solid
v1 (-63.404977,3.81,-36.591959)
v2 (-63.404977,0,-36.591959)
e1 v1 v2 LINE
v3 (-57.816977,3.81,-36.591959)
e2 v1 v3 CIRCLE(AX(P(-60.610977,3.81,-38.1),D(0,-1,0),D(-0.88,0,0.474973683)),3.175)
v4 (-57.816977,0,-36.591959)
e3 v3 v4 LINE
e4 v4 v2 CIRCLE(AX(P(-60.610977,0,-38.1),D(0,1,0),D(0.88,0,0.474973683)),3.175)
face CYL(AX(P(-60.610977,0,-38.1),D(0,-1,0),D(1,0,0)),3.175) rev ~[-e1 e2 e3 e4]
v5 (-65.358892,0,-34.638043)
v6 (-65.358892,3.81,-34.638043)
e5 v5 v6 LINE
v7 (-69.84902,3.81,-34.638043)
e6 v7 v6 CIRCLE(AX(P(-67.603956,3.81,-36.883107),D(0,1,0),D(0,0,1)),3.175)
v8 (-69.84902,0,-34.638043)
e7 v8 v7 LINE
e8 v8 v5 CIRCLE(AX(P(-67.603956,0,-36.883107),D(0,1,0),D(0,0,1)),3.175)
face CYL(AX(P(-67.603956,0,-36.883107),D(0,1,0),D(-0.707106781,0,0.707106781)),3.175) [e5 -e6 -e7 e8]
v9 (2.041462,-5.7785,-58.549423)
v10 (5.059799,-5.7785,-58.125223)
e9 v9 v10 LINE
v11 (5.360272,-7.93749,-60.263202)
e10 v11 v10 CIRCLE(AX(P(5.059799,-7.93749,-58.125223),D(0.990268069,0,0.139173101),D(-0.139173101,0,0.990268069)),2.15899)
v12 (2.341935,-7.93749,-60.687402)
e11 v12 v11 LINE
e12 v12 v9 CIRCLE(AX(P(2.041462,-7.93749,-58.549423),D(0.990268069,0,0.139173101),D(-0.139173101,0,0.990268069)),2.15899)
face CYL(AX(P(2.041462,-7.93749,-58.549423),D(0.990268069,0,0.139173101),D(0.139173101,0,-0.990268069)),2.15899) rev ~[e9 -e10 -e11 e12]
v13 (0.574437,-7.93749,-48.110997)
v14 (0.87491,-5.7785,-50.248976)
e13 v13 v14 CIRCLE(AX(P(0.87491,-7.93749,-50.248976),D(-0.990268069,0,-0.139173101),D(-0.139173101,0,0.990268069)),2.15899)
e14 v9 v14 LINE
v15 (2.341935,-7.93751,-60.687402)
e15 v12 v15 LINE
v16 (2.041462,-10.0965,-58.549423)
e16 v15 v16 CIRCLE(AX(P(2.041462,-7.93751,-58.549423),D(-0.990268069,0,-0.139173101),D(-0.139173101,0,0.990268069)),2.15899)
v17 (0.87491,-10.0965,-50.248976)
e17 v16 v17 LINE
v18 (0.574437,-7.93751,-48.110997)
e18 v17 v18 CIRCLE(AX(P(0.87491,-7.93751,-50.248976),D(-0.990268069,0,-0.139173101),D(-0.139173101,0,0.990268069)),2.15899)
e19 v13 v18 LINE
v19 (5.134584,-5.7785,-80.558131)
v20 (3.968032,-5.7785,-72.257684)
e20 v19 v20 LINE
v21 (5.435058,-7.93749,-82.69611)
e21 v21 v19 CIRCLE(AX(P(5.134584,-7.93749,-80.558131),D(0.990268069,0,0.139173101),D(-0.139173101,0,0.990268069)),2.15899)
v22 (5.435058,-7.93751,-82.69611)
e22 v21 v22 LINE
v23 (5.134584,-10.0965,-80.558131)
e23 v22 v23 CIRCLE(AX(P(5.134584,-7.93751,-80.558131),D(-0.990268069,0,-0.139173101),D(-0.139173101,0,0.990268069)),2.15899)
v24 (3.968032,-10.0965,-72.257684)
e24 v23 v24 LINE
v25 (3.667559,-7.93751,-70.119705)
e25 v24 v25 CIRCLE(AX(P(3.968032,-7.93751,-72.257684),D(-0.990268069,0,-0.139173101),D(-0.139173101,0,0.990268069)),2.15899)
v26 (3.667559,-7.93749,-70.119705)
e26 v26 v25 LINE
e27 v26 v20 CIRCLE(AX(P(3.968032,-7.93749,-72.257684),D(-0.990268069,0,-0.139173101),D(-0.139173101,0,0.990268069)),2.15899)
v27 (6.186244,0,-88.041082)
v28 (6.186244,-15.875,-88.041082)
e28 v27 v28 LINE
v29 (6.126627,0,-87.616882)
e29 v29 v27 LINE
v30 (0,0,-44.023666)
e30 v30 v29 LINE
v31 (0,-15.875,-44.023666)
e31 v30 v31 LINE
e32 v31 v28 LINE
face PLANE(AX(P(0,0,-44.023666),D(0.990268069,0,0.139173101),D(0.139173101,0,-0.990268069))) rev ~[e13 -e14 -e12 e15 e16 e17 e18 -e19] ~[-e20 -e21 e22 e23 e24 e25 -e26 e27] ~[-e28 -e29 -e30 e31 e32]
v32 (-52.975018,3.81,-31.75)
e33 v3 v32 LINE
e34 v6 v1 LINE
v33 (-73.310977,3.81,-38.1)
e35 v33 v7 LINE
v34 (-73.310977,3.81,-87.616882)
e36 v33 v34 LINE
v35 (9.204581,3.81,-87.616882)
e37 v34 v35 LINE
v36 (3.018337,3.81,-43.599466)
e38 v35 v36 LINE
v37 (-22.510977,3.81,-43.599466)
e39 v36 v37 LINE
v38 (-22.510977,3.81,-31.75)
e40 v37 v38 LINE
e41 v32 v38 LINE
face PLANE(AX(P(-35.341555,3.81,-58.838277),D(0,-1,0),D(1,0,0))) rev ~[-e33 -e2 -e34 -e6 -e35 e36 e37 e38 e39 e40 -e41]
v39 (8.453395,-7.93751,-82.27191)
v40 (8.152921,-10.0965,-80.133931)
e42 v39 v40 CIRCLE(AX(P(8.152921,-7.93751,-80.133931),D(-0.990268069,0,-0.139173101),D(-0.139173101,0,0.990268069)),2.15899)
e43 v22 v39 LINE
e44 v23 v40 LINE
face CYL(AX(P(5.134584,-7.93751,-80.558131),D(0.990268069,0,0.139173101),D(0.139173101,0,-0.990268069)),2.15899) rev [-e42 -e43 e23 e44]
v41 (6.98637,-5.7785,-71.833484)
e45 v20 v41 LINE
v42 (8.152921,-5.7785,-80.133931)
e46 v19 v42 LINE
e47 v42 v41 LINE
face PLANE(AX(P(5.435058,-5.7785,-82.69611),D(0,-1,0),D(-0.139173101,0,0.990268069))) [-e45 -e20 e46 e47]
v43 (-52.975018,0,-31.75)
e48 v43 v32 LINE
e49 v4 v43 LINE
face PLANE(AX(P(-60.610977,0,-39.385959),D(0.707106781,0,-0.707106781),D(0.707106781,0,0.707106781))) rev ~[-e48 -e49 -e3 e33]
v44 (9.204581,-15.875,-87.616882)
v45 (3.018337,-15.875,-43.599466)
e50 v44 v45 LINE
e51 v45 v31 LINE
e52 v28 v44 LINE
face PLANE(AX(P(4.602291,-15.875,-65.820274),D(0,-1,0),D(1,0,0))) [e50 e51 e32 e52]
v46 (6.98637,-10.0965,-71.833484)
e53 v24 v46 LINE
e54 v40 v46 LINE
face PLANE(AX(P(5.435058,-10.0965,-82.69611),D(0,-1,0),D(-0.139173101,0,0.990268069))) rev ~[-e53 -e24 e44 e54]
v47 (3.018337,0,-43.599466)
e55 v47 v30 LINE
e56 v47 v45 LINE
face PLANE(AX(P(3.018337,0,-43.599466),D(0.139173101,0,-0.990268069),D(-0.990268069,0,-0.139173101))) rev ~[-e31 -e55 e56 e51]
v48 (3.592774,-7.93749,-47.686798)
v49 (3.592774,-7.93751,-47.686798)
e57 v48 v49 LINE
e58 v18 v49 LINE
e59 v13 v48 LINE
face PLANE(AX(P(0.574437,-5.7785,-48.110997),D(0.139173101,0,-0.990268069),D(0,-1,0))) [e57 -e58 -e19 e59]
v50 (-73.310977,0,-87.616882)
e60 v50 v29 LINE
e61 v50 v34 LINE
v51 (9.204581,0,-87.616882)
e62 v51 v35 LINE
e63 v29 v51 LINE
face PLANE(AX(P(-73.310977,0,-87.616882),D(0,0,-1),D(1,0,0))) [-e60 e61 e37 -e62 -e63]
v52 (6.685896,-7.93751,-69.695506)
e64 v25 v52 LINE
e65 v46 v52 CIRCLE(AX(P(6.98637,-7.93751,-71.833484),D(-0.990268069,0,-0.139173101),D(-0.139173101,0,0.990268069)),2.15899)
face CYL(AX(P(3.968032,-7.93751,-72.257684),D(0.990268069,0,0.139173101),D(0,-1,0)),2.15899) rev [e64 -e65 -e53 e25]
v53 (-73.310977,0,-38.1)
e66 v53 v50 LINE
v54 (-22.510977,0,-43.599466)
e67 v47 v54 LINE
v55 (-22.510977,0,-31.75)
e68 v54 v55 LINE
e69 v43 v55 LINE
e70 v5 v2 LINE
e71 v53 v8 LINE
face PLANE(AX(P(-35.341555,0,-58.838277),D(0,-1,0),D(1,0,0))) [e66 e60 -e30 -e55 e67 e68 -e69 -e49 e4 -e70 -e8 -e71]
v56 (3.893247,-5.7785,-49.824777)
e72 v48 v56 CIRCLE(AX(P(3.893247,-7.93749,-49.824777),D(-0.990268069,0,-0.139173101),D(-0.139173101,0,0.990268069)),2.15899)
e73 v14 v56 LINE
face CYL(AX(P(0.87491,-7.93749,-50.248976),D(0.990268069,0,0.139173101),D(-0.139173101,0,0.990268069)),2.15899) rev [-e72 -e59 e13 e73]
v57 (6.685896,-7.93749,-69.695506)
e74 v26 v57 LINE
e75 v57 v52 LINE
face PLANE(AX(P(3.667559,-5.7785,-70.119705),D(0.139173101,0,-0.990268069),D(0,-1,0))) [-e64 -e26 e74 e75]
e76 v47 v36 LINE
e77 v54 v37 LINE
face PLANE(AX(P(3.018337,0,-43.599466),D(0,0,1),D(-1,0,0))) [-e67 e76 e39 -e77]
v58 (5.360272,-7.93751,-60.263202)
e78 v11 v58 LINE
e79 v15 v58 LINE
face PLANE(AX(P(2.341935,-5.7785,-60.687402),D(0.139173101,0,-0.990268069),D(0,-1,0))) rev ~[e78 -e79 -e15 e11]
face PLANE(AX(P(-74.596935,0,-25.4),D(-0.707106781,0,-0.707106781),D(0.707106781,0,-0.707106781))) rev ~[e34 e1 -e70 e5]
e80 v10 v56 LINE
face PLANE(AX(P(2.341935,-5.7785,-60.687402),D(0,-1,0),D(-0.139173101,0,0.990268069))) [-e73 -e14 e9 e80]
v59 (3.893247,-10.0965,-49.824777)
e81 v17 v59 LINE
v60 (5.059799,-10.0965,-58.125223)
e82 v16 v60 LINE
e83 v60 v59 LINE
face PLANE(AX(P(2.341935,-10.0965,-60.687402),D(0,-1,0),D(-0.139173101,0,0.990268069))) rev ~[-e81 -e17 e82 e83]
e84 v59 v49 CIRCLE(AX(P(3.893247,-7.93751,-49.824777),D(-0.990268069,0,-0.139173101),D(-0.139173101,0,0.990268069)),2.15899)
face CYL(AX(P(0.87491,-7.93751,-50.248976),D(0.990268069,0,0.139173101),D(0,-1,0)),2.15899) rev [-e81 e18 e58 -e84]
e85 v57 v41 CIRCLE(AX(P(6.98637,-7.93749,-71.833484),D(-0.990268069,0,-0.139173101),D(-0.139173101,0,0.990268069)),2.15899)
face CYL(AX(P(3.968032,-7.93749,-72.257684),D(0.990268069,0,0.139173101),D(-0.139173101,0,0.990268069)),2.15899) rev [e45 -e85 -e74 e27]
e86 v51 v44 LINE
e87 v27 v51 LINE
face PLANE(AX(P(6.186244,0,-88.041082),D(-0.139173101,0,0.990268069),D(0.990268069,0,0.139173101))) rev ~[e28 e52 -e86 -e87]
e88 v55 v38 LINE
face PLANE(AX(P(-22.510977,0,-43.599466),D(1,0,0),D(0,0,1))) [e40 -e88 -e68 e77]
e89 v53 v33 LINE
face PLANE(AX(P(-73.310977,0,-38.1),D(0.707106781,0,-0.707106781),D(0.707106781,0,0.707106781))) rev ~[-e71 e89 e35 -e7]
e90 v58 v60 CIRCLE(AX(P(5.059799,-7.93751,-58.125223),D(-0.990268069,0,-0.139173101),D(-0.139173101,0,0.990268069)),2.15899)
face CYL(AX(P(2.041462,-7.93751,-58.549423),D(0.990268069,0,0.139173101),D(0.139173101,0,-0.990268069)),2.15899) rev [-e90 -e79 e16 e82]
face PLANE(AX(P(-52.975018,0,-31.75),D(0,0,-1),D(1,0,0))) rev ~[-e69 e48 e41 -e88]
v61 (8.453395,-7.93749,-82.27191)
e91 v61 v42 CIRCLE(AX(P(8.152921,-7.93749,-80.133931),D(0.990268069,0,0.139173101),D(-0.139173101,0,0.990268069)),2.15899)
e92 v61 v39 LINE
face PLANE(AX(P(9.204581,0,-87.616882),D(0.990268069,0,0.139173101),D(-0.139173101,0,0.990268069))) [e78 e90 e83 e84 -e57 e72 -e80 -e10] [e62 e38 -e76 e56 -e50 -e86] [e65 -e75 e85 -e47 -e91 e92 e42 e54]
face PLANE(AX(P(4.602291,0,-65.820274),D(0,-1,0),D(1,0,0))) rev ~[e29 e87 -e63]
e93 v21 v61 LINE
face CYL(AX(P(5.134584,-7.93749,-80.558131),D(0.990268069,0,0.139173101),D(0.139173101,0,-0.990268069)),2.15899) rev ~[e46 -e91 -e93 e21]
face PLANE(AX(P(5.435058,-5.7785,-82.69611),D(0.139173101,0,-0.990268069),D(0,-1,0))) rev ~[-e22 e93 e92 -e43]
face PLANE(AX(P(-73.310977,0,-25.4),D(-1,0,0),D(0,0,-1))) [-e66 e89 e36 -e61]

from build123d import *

# Parameters (mm, degrees)
F1_DEPTH  = 15.875
F2_W      = 4.318
F2_H      = 12.7
F3_DEPTH  = 9.175040233
F4_R      = 2.15899
F5_R      = 3.175
F6_DEPTH  = 3.81
F8_DEPTH  = 25.4
F10_DEPTH = 25.4
F11_R     = 3.175


# Not quite as in the source:
# - a fillet or chamfer is up to 0.001 mm smaller than in the source, because OpenCascade refuses the exact size


with BuildPart() as f1:
    # F0 (on Front) → F1 (new body)
    with BuildSketch(Plane.XZ):
        Polygon((9.2045814112, -87.6168819653), (3.0183370735, -43.5994663098), (0, -44.0236659215), (6.1862443377, -88.041081577), align=None)
    extrude(amount=F1_DEPTH)

    # F2 (on face) → F3 (cut, through all)
    with BuildSketch(Plane(origin=(-6.067283434, 0, -0.8527010782), x_dir=(0, -1, 0), z_dir=(-0.9902680687, 0, -0.139173101))):
        with Locations((7.9375, -54.072730631)):
            Rectangle(F2_W, F2_H)
        with Locations((7.9375, -76.297730631)):
            Rectangle(F2_W, F2_H)
    extrude(amount=-F3_DEPTH, mode=Mode.SUBTRACT)

    # F4 (radius 2.159 in the source; OpenCascade refuses exactly that, so slightly less here)
    f4_edges = [f1.edges().sort_by_distance(p)[0] for p in [
        (2.083606, -5.7785, -47.898898),
        (5.176728, -5.7785, -69.907605),
        (5.176728, -10.0965, -69.907605),
        (2.083606, -10.0965, -47.898898),
        (3.851104, -10.0965, -60.475302),
        (6.944226, -10.0965, -82.48401),
        (6.944226, -5.7785, -82.48401),
        (3.851104, -5.7785, -60.475302),
    ]]
    fillet(f4_edges, radius=F4_R)

    # F5 (on Front) → F6 (join)
    with BuildSketch(Plane.XZ):
        Polygon((9.2045814112, -87.6168819653), (3.0183370735, -43.5994663098), (-22.5109767612, -43.5994663098), (-22.5109767612, -25.4), (-73.3109767612, -25.4), (-73.3109767612, -87.6168819653), align=None)
        with Locations((-60.6109767612, -38.1)):
            Circle(F5_R, mode=Mode.SUBTRACT)
    extrude(amount=-F6_DEPTH)

    # F7 (on Front) → F8 (cut)
    with BuildSketch(Plane.XZ):
        Polygon((-73.3109767612, -38.1), (-60.6109767612, -25.4), (-73.3109767612, -25.4), align=None)
    extrude(amount=-F8_DEPTH, mode=Mode.SUBTRACT)

    # F9 (on Front) → F10 (cut)
    with BuildSketch(Plane.XZ):
        Polygon((-74.5969353161, -25.4), (-60.6109767612, -39.3859585549), (-52.9750182062, -31.75), (-22.5109767612, -31.75), (-22.5109767612, -25.4), align=None)
    extrude(amount=-F10_DEPTH, mode=Mode.SUBTRACT)

    # F11
    f11_edges = [f1.edges().sort_by_distance(p)[0] for p in [
        (-67.603956, 1.905, -32.392979),
    ]]
    fillet(f11_edges, radius=F11_R)


solid = f1.part
